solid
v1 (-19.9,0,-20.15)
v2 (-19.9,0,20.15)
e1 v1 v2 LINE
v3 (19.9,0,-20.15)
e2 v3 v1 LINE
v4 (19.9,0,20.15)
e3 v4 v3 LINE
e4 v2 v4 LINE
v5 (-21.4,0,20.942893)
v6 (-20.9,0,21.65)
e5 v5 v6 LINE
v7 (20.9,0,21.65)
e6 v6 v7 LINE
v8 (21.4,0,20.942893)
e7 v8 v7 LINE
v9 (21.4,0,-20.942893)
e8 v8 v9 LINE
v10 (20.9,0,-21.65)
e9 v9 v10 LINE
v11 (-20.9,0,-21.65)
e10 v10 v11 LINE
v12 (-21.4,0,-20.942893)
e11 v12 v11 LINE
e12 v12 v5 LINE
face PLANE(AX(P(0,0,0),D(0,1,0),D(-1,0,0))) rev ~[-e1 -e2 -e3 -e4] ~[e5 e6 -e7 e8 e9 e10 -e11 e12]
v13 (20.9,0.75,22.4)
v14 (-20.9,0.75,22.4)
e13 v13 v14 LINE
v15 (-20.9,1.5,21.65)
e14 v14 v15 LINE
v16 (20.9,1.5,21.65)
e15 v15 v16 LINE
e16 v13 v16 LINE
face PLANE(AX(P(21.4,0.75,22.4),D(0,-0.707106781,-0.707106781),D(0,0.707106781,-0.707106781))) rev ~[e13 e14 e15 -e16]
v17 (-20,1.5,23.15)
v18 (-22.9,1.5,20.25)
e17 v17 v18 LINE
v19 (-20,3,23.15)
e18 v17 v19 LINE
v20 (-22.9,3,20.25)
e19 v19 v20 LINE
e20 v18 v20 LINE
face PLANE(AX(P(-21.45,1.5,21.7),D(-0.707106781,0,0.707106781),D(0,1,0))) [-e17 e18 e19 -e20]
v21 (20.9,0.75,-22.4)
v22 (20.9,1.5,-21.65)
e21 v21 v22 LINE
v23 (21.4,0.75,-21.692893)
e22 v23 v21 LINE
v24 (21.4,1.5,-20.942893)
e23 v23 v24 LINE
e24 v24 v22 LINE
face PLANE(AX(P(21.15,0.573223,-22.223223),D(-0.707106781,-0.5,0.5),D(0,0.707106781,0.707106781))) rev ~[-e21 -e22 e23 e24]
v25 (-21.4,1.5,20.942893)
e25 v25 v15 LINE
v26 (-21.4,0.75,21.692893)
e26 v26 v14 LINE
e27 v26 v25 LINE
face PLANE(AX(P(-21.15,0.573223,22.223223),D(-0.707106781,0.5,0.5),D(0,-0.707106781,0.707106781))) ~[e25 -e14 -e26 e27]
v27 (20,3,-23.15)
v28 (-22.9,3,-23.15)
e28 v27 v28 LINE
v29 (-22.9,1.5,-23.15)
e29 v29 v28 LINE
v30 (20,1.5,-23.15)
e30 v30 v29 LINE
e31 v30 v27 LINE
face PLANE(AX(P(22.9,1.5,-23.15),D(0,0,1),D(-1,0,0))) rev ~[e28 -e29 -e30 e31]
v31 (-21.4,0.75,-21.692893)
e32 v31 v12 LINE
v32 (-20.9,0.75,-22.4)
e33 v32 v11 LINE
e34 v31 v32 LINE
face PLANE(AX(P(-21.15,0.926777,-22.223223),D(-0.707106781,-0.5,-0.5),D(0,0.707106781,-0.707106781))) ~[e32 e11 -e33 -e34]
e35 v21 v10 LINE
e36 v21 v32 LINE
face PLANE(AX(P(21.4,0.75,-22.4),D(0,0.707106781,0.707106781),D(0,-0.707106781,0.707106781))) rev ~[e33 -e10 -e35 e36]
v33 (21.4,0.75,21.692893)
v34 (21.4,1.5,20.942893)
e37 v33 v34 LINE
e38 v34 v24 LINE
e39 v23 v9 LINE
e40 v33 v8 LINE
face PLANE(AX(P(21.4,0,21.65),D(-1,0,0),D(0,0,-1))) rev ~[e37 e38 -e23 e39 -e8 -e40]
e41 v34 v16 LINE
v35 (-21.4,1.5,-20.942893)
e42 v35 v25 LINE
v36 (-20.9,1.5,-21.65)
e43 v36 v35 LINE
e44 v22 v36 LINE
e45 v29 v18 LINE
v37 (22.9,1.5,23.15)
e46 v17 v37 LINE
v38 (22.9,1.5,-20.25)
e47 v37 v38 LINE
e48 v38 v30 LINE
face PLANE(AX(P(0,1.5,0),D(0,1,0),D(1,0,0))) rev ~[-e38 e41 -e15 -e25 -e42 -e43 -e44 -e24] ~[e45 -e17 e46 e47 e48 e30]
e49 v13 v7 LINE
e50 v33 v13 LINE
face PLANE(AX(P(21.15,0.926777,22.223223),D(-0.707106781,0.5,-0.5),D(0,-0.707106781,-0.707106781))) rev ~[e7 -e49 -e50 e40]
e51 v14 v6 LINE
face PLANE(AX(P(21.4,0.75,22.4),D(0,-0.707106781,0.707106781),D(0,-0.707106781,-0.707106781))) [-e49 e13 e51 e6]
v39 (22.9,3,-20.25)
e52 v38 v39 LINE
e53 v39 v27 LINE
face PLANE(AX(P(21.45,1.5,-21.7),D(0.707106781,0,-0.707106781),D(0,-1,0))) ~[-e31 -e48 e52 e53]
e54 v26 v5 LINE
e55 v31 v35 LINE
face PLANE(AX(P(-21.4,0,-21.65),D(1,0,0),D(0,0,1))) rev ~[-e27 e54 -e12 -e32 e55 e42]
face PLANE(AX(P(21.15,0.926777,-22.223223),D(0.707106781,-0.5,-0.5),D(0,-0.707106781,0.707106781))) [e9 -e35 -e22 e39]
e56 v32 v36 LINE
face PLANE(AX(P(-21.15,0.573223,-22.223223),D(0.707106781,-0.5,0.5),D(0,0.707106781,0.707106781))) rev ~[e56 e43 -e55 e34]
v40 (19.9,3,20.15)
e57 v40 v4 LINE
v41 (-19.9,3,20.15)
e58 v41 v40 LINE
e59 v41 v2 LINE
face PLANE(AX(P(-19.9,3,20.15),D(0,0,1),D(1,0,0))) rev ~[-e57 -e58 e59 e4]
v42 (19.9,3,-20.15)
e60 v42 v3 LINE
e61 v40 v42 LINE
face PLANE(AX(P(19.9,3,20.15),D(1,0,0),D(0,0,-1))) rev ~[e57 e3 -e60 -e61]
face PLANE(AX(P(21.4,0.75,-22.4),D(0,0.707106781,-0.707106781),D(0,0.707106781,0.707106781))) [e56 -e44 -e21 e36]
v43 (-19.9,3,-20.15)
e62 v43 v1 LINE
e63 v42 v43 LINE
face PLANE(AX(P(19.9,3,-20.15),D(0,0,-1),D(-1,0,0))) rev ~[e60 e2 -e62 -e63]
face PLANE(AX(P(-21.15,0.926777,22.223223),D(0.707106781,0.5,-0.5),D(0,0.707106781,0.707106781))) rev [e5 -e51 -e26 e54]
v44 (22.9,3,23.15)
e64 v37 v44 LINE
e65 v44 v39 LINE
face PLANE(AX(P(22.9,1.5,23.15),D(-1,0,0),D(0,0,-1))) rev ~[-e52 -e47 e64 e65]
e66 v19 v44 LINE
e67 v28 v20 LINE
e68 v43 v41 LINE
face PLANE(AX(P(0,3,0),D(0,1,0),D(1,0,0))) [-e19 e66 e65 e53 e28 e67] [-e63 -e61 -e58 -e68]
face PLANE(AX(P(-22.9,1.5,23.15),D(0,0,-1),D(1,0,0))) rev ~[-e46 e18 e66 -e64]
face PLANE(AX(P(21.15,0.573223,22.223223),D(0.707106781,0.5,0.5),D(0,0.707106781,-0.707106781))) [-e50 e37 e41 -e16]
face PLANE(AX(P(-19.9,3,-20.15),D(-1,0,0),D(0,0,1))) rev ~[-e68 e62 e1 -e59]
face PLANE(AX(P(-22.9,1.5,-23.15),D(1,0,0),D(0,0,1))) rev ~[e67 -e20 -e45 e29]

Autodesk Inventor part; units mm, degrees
ref_plane "YZ Plane" through (0, 0, 0) normal (1, 0, 0) x (0, 1, 0)
ref_plane "XZ Plane" through (0, 0, 0) normal (0, 1, 0) x (-1, 0, 0)
ref_plane "XY Plane" through (0, 0, 0) normal (0, 0, 1) x (1, 0, 0)
sketch "Sketch1" plane through (0, 0, 0) normal (0, 1, 0) x (-1, 0, 0)
  line L0 (-21.4, -21.65) -> (21.4, -21.65)
  line L1 (21.4, -21.65) -> (21.4, 21.65)
  line L2 (21.4, 21.65) -> (-21.4, 21.65)
  line L3 (-21.4, 21.65) -> (-21.4, -21.65)
  line L4 (-21.4, -21.65) -> (21.4, 21.65) construction
  line L5 (21.4, -21.65) -> (-21.4, 21.65) construction
  point P0 (0, 0)
  dimension "d0" = 43.3
  dimension "d1" = 42.8
extrude "Extrusion1" add sketch "Sketch1" along normal blind 1.5
sketch "Sketch2" plane through (0, 1.5, 0) normal (0, 1, 0) x (1, 0, 0)
  line L0 (22.9, 23.15) -> (-22.9, 23.15)
  line L1 (-22.9, 23.15) -> (-22.9, -23.15)
  line L2 (-22.9, -23.15) -> (22.9, -23.15)
  line L3 (22.9, -23.15) -> (22.9, 23.15)
  line L4 (22.9, 23.15) -> (-22.9, -23.15) construction
  line L5 (-22.9, 23.15) -> (22.9, -23.15) construction
  line L6 (-21.4, 21.65) -> (-21.4, -21.65) projected
  line L7 (-21.4, -21.65) -> (21.4, -21.65) projected
  point P0 (0, 0)
  dimension "d4" = 1.5
  dimension "d5" = 1.5
extrude "Extrusion2" add sketch "Sketch2" along normal blind 1.5
sketch "Sketch3" plane through (0, 3, 0) normal (0, 1, 0) x (1, 0, 0)
  line L0 (19.9, 20.15) -> (-19.9, 20.15)
  line L1 (-19.9, 20.15) -> (-19.9, -20.15)
  line L2 (-19.9, -20.15) -> (19.9, -20.15)
  line L3 (19.9, -20.15) -> (19.9, 20.15)
  line L4 (19.9, 20.15) -> (-19.9, -20.15) construction
  line L5 (-19.9, 20.15) -> (19.9, -20.15) construction
  line L6 (-21.4, -21.65) -> (21.4, -21.65) projected
  line L7 (-21.4, 21.65) -> (-21.4, -21.65) projected
  point P0 (0, 0)
  dimension "d8" = 1.5
  dimension "d9" = 1.5
extrude "Extrusion3" cut sketch "Sketch3" against normal through all
chamfer "Chamfer1" distance 2.9 angle 45 2 edges at (22.9, 2.25, -23.15) (-22.9, 2.25, 23.15)
sketch "Sketch4" plane through (21.4, 0, 21.65) normal (1, 0, 0) x (0, 0, -1)
  line L0 (1.4, 1.5) -> (-1.5, 1.5) projected
  line L1 (-0.75, 1.5) -> (44.05, 1.5)
  line L2 (44.05, 1.5) -> (44.05, 0)
  line L3 (44.05, 0) -> (-0.75, 0)
  line L4 (-0.75, 0) -> (-0.75, 1.5)
  line L5 (0, 0) -> (43.3, 0) projected
  line L6 (-0.75, 0.75) -> (0, 0)
  line L7 (-0.75, 0.75) -> (0, 1.5)
  line L8 (21.65, 9.7528) -> (21.65, -18.8519)
  line L9 (0, 0) -> (0, 1.5) projected
  line L10 (44.05, 0.75) -> (43.3, 0)
  line L11 (44.05, 0.75) -> (43.3, 1.5)
  line L12 (43.3, 0) -> (43.3, 1.5)
  point P0 (21.65, 0)
  point P1 (21.65, 0)
  point P2 (21.65, 0)
  dimension "d16" = 44.8
  dimension "d17" = 22.4
  dimension "d18" = 0.75
extrude "Extrusion4" add sketch "Sketch4" against normal up to surface (42.8 mm away) contours L9 L6 L7 | L11 L10 L12
chamfer "Chamfer2" distance 0.5 angle 45 8 edges at (-21.4, 0.375, -22.025) (-21.4, 1.125, -22.025) (-21.4, 0.375, 22.025) (-21.4, 1.125, 22.025) (21.4, 0.375, 22.025) (21.4, 1.125, 22.025) (21.4, 0.375, -22.025) (21.4, 1.125, -22.025)
equation "\"d17\" = 0.5 * d16"
properties part number "Installation Tool Collar"
